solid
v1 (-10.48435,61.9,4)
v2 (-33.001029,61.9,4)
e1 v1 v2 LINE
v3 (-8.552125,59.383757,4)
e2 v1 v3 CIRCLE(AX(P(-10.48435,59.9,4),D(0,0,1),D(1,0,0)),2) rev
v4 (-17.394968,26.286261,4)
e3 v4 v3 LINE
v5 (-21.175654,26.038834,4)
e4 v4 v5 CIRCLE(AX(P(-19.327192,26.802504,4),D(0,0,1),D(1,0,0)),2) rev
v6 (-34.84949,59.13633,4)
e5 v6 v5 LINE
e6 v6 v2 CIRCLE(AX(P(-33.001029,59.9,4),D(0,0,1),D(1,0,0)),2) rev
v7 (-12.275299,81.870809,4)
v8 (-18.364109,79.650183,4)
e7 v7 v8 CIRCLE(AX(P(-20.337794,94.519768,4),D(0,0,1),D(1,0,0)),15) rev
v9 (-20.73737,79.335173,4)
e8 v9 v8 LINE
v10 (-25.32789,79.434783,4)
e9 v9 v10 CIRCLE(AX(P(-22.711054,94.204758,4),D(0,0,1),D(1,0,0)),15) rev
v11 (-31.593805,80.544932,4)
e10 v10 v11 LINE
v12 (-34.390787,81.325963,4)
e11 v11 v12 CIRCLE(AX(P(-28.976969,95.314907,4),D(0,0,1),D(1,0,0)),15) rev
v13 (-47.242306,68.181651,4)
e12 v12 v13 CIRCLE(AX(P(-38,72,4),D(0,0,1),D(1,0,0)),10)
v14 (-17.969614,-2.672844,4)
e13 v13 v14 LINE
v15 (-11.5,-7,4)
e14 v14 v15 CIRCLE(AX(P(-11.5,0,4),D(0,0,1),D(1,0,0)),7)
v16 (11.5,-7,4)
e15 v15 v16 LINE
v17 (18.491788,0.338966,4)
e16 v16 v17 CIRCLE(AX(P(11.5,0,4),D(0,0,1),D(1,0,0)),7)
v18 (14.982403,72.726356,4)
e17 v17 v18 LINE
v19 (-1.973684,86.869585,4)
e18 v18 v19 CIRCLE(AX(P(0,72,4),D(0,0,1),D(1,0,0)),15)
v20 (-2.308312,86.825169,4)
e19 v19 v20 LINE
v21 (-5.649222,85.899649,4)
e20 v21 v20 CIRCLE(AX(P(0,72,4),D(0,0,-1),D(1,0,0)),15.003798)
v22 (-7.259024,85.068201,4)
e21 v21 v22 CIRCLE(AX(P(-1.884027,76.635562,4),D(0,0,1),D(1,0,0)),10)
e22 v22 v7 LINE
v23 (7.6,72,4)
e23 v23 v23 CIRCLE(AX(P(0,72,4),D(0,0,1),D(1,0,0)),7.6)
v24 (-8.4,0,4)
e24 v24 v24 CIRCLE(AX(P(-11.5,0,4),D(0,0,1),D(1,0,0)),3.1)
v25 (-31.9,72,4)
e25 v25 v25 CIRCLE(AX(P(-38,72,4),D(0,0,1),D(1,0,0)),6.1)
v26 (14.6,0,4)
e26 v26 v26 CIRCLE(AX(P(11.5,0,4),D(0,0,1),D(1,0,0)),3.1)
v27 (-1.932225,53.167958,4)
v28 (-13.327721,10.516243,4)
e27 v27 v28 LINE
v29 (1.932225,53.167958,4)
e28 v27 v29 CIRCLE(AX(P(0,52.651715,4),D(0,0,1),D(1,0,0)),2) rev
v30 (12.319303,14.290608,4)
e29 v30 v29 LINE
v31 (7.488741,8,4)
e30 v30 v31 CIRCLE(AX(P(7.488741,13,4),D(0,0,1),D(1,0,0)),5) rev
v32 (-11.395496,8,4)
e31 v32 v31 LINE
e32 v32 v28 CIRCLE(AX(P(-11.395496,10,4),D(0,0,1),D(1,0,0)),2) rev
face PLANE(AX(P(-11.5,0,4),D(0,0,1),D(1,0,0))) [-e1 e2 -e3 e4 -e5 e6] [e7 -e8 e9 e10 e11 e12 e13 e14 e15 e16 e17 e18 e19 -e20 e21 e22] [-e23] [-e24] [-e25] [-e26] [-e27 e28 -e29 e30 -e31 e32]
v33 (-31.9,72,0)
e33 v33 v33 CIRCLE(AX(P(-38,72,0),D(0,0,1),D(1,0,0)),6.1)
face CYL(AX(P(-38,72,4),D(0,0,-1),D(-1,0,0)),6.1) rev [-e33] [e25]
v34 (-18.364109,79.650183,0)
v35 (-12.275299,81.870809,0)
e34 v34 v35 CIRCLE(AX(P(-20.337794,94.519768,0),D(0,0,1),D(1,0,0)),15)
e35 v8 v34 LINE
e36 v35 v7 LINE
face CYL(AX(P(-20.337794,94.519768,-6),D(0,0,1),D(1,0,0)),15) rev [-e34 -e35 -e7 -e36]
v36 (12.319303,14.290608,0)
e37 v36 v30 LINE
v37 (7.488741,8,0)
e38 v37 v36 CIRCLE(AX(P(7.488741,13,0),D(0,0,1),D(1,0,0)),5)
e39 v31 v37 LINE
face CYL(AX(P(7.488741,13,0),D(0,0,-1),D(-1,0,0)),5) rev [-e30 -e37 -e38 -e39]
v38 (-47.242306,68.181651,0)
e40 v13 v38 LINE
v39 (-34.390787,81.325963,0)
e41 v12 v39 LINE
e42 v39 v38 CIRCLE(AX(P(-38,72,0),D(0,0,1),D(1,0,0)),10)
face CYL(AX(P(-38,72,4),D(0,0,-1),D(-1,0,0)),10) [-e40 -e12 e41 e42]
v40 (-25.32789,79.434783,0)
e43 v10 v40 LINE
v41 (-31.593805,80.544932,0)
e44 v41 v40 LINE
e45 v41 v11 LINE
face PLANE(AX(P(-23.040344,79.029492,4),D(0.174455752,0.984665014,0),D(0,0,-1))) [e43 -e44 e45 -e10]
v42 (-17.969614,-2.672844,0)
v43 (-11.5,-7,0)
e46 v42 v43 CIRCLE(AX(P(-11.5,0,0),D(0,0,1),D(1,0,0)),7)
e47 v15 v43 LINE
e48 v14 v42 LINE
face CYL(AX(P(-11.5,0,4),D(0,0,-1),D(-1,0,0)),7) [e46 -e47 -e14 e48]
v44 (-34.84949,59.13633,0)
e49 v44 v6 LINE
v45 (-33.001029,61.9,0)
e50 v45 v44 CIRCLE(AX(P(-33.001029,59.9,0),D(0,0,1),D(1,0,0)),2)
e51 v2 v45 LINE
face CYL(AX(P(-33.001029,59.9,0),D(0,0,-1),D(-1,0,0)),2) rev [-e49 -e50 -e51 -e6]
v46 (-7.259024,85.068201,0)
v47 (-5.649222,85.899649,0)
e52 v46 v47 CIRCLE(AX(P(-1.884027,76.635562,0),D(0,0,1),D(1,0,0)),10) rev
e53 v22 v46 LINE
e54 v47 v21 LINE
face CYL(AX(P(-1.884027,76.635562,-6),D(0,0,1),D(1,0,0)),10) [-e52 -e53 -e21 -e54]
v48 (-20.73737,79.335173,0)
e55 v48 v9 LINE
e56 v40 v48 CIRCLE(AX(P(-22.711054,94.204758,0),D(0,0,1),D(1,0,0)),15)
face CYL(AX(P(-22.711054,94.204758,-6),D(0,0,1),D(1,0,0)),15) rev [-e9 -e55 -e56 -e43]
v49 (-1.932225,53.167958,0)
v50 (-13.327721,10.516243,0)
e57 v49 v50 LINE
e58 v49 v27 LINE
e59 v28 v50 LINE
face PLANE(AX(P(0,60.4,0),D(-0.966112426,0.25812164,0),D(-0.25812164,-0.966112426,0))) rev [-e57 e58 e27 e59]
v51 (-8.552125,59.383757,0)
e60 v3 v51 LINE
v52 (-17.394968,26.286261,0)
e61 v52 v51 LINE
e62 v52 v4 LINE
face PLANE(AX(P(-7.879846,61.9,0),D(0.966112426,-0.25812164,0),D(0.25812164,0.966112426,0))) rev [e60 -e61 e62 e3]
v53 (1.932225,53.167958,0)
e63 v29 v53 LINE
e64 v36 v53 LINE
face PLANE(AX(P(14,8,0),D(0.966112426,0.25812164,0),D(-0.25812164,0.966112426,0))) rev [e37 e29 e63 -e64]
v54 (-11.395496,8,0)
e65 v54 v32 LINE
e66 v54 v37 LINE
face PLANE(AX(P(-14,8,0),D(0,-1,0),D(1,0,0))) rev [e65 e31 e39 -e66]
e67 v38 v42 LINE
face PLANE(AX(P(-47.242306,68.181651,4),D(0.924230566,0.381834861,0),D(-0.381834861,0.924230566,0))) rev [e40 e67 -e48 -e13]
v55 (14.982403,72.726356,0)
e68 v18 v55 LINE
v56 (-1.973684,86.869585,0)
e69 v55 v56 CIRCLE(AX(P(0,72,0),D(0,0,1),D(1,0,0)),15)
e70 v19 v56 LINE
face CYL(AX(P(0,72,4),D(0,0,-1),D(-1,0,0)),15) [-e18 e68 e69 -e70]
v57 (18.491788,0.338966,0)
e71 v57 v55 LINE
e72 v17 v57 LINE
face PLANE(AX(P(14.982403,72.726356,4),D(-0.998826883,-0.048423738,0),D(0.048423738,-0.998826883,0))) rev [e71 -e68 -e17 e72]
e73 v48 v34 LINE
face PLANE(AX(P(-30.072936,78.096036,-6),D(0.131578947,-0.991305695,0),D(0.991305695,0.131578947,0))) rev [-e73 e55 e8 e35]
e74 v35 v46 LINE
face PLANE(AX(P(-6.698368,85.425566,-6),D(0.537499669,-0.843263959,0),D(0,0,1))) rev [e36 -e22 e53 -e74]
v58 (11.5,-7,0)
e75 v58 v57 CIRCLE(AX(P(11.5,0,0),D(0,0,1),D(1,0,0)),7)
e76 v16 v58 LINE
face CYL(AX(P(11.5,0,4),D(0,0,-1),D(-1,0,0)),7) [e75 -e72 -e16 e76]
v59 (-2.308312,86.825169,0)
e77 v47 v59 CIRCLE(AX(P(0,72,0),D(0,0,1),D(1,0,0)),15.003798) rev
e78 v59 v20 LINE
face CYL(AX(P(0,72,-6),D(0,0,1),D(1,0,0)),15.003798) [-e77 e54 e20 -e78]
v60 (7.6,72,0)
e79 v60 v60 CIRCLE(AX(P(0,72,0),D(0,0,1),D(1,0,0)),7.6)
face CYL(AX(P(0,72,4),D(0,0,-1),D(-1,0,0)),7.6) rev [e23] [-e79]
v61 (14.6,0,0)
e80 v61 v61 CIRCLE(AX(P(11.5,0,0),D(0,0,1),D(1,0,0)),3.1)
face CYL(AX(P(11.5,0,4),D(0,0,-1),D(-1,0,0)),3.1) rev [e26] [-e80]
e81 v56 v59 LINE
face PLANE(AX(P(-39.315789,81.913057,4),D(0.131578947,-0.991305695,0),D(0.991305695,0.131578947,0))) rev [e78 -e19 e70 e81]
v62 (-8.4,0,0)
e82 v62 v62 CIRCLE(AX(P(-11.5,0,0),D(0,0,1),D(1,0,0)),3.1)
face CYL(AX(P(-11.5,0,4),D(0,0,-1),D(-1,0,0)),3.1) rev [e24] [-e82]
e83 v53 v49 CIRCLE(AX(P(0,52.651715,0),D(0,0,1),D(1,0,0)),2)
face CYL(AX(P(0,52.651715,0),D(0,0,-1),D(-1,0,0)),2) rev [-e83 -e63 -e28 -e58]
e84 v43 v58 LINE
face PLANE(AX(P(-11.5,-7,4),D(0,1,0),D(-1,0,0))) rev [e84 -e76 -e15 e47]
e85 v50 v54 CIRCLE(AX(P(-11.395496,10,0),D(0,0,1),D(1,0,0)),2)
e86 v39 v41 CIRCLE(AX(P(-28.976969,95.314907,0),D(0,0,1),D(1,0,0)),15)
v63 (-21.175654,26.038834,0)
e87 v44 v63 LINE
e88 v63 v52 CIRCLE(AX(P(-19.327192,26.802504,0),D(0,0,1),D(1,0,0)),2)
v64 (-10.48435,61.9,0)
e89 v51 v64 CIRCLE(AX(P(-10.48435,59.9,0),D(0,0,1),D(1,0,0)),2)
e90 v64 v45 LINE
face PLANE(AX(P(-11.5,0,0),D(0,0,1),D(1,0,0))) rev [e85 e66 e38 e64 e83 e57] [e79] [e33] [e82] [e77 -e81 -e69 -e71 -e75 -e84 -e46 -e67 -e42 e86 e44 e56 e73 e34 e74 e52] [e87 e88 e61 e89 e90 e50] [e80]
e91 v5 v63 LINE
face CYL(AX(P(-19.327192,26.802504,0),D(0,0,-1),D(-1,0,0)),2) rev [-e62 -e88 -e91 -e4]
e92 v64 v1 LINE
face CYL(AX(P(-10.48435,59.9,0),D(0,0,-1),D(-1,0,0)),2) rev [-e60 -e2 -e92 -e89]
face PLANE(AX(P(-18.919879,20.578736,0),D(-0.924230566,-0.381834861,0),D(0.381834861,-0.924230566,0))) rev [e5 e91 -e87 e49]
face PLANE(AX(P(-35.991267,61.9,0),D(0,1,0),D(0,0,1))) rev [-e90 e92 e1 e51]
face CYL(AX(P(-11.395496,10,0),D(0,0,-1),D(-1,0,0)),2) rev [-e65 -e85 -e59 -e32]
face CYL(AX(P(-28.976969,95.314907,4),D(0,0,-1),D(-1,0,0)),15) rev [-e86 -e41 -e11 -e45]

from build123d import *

# Parameters (mm, degrees)
SKETCH_1_R            = 3.1
SKETCH_1_R_2          = 7.6
SKETCH_1_R_3          = 6.1
EXTRUDE_1_DEPTH       = 4
CUT_EXTRUDE_1_DEPTH   = 4
FILLET_1_R            = 2
FILLET_2_R            = 5
CUT_EXTRUDE_START     = -10
CUT_EXTRUDE_2_DEPTH   = 10
CHAMFER_START         = -75.71880289
CHAMFER_2_OUTLINE_W   = 9.932436379
CHAMFER_2_OUTLINE_H   = 4
CHAMFER_2_DEPTH       = 0.082131492
CHAMFER_START_2       = -75.636671398
CHAMFER_2_2_OUTLINE_W = 9.932436379
CHAMFER_2_2_OUTLINE_H = 4
CHAMFER_2_2_DEPTH     = 1.179418361
FILLET_4_R            = 15
FILLET_5_R            = 10


with BuildPart() as part:
    # 草图1 → 凸台-拉伸1 (new body)
    with BuildSketch(Plane.XY):
        with BuildLine():
            Line((-47.242305659, 68.18165139), (-17.969613961, -2.672844027))
            ThreePointArc((-17.969613961, -2.672844027), (-15.391663642, -5.818501018), (-11.5, -7))
            Line((-11.5, -7), (11.5, -7))
            ThreePointArc((11.5, -7), (16.568173397, -4.828417796), (18.491788179, 0.338966167))
            Line((18.491788179, 0.338966167), (14.98240324, 72.726356073))
            ThreePointArc((14.98240324, 72.726356073), (9.608039696, 83.518922397), (-1.973684211, 86.869585423))
            Line((-1.973684211, 86.869585423), (-39.315789474, 81.913056948))
            ThreePointArc((-39.315789474, 81.913056948), (-46.660613019, 76.999378175), (-47.242305659, 68.18165139))
        make_face()
        with Locations((11.5, 0)):
            Circle(SKETCH_1_R, mode=Mode.SUBTRACT)
        with Locations((-11.5, 0)):
            Circle(SKETCH_1_R, mode=Mode.SUBTRACT)
        with Locations((0, 72)):
            Circle(SKETCH_1_R_2, mode=Mode.SUBTRACT)
        with Locations((-38, 72)):
            Circle(SKETCH_1_R_3, mode=Mode.SUBTRACT)
    extrude(amount=EXTRUDE_1_DEPTH)

    # 草图2 → 切除-拉伸1 (cut)
    with BuildSketch(Plane.XY.offset(4)):
        Polygon((0, 60.4), (-14, 8), (14, 8), align=None)
        Polygon((-35.991267369, 61.9), (-7.879846422, 61.9), (-18.919878801, 20.578735952), align=None)
    extrude(amount=-CUT_EXTRUDE_1_DEPTH, mode=Mode.SUBTRACT)

    # 圆角1
    fillet_1_edges = [part.edges().sort_by_distance(p)[0] for p in [
        (-18.919878801, 20.578735952, 2),
        (-35.991267369, 61.9, 2),
        (-7.879846422, 61.9, 2),
        (0, 60.4, 2),
        (-14, 8, 2),
    ]]
    fillet(fillet_1_edges, radius=FILLET_1_R)

    # 圆角2
    fillet_2_edges = [part.edges().sort_by_distance(p)[0] for p in [
        (14, 8, 2),
    ]]
    fillet(fillet_2_edges, radius=FILLET_2_R)

    # 草图3 → 切除-拉伸2 (cut)
    with BuildSketch(Plane.XY.offset(4).offset(CUT_EXTRUDE_START)):
        with BuildLine():
            Line((-30.07293559, 78.096035584), (-12.403974557, 80.441289229))
            ThreePointArc((-12.403974557, 80.441289229), (-8.018810771, 84.681191682), (-2.308312161, 86.825169261))
            Line((-2.308312161, 86.825169261), (-39.315789474, 81.913056948))
            ThreePointArc((-39.315789474, 81.913056948), (-34.182978636, 81.242853883), (-30.07293559, 78.096035584))
        make_face()
    extrude(amount=CUT_EXTRUDE_2_DEPTH, mode=Mode.SUBTRACT)

    # 倒角1
    # the kernel refuses this chamfer: 10 mm, written as the material it adds along each edge
    with BuildSketch(Plane(origin=(-30.07293559, 78.096035584, 0), x_dir=(0.9913056948335455, 0.13157894736842105, 0), z_dir=(0, 0, 1))) as chamfer_1_piece_1:
        with BuildLine():
            Line((7.475531418, -0.121000067), (-3.274957131, 3.290873048))
            Line((-3.274957131, 3.290873048), (-3.390288264, 3.127475588))
            ThreePointArc((-3.390288264, 3.127475588), (-1.542012582, 1.735773049), (-0.173205081, -0.1))
            Line((-0.173205081, -0.1), (0, -0.2))
            ThreePointArc((0, -0.2), (3.737765709, -0.2), (7.475531418, -0.321000067))
            Line((7.475531418, -0.321000067), (7.475531418, -0.121000067))
        make_face()
    extrude(amount=4)

    # 倒角2: read off the stored shape, not the designer's step
    # 倒角2 outline → 倒角2 (cut)
    with BuildSketch(Plane(origin=(0, 0, 0), x_dir=(0.8432639594677482, 0.5374996694536432, 0), z_dir=(0.5374996694536432, -0.8432639594677483, 0)).offset(CHAMFER_START)):
        with Locations((35.301502575, 2)):
            Rectangle(CHAMFER_2_OUTLINE_W, CHAMFER_2_OUTLINE_H)
    extrude(amount=CHAMFER_2_DEPTH, mode=Mode.SUBTRACT)

    # Chamfer 2 2 outline → Chamfer 2 2 (add)
    with BuildSketch(Plane(origin=(0, 0, 0), x_dir=(0.8432639594677482, 0.5374996694536432, 0), z_dir=(0.5374996694536432, -0.8432639594677483, 0)).offset(CHAMFER_START_2)):
        with Locations((35.301502575, 2)):
            Rectangle(CHAMFER_2_2_OUTLINE_W, CHAMFER_2_2_OUTLINE_H)
    extrude(amount=CHAMFER_2_2_DEPTH)

    # 圆角4
    fillet_4_edges = [part.edges().sort_by_distance(p)[0] for p in [
        (-23.040343668, 79.029492385, 2),
        (-33.358562851, 80.857599065, 2),
        (-15.074033853, 80.086884334, 2),
    ]]
    fillet(fillet_4_edges, radius=FILLET_4_R)

    # 圆角5
    fillet_5_edges = [part.edges().sort_by_distance(p)[0] for p in [
        (-6.698368225, 85.425565604, 2),
    ]]
    fillet(fillet_5_edges, radius=FILLET_5_R)


solid = part.part
